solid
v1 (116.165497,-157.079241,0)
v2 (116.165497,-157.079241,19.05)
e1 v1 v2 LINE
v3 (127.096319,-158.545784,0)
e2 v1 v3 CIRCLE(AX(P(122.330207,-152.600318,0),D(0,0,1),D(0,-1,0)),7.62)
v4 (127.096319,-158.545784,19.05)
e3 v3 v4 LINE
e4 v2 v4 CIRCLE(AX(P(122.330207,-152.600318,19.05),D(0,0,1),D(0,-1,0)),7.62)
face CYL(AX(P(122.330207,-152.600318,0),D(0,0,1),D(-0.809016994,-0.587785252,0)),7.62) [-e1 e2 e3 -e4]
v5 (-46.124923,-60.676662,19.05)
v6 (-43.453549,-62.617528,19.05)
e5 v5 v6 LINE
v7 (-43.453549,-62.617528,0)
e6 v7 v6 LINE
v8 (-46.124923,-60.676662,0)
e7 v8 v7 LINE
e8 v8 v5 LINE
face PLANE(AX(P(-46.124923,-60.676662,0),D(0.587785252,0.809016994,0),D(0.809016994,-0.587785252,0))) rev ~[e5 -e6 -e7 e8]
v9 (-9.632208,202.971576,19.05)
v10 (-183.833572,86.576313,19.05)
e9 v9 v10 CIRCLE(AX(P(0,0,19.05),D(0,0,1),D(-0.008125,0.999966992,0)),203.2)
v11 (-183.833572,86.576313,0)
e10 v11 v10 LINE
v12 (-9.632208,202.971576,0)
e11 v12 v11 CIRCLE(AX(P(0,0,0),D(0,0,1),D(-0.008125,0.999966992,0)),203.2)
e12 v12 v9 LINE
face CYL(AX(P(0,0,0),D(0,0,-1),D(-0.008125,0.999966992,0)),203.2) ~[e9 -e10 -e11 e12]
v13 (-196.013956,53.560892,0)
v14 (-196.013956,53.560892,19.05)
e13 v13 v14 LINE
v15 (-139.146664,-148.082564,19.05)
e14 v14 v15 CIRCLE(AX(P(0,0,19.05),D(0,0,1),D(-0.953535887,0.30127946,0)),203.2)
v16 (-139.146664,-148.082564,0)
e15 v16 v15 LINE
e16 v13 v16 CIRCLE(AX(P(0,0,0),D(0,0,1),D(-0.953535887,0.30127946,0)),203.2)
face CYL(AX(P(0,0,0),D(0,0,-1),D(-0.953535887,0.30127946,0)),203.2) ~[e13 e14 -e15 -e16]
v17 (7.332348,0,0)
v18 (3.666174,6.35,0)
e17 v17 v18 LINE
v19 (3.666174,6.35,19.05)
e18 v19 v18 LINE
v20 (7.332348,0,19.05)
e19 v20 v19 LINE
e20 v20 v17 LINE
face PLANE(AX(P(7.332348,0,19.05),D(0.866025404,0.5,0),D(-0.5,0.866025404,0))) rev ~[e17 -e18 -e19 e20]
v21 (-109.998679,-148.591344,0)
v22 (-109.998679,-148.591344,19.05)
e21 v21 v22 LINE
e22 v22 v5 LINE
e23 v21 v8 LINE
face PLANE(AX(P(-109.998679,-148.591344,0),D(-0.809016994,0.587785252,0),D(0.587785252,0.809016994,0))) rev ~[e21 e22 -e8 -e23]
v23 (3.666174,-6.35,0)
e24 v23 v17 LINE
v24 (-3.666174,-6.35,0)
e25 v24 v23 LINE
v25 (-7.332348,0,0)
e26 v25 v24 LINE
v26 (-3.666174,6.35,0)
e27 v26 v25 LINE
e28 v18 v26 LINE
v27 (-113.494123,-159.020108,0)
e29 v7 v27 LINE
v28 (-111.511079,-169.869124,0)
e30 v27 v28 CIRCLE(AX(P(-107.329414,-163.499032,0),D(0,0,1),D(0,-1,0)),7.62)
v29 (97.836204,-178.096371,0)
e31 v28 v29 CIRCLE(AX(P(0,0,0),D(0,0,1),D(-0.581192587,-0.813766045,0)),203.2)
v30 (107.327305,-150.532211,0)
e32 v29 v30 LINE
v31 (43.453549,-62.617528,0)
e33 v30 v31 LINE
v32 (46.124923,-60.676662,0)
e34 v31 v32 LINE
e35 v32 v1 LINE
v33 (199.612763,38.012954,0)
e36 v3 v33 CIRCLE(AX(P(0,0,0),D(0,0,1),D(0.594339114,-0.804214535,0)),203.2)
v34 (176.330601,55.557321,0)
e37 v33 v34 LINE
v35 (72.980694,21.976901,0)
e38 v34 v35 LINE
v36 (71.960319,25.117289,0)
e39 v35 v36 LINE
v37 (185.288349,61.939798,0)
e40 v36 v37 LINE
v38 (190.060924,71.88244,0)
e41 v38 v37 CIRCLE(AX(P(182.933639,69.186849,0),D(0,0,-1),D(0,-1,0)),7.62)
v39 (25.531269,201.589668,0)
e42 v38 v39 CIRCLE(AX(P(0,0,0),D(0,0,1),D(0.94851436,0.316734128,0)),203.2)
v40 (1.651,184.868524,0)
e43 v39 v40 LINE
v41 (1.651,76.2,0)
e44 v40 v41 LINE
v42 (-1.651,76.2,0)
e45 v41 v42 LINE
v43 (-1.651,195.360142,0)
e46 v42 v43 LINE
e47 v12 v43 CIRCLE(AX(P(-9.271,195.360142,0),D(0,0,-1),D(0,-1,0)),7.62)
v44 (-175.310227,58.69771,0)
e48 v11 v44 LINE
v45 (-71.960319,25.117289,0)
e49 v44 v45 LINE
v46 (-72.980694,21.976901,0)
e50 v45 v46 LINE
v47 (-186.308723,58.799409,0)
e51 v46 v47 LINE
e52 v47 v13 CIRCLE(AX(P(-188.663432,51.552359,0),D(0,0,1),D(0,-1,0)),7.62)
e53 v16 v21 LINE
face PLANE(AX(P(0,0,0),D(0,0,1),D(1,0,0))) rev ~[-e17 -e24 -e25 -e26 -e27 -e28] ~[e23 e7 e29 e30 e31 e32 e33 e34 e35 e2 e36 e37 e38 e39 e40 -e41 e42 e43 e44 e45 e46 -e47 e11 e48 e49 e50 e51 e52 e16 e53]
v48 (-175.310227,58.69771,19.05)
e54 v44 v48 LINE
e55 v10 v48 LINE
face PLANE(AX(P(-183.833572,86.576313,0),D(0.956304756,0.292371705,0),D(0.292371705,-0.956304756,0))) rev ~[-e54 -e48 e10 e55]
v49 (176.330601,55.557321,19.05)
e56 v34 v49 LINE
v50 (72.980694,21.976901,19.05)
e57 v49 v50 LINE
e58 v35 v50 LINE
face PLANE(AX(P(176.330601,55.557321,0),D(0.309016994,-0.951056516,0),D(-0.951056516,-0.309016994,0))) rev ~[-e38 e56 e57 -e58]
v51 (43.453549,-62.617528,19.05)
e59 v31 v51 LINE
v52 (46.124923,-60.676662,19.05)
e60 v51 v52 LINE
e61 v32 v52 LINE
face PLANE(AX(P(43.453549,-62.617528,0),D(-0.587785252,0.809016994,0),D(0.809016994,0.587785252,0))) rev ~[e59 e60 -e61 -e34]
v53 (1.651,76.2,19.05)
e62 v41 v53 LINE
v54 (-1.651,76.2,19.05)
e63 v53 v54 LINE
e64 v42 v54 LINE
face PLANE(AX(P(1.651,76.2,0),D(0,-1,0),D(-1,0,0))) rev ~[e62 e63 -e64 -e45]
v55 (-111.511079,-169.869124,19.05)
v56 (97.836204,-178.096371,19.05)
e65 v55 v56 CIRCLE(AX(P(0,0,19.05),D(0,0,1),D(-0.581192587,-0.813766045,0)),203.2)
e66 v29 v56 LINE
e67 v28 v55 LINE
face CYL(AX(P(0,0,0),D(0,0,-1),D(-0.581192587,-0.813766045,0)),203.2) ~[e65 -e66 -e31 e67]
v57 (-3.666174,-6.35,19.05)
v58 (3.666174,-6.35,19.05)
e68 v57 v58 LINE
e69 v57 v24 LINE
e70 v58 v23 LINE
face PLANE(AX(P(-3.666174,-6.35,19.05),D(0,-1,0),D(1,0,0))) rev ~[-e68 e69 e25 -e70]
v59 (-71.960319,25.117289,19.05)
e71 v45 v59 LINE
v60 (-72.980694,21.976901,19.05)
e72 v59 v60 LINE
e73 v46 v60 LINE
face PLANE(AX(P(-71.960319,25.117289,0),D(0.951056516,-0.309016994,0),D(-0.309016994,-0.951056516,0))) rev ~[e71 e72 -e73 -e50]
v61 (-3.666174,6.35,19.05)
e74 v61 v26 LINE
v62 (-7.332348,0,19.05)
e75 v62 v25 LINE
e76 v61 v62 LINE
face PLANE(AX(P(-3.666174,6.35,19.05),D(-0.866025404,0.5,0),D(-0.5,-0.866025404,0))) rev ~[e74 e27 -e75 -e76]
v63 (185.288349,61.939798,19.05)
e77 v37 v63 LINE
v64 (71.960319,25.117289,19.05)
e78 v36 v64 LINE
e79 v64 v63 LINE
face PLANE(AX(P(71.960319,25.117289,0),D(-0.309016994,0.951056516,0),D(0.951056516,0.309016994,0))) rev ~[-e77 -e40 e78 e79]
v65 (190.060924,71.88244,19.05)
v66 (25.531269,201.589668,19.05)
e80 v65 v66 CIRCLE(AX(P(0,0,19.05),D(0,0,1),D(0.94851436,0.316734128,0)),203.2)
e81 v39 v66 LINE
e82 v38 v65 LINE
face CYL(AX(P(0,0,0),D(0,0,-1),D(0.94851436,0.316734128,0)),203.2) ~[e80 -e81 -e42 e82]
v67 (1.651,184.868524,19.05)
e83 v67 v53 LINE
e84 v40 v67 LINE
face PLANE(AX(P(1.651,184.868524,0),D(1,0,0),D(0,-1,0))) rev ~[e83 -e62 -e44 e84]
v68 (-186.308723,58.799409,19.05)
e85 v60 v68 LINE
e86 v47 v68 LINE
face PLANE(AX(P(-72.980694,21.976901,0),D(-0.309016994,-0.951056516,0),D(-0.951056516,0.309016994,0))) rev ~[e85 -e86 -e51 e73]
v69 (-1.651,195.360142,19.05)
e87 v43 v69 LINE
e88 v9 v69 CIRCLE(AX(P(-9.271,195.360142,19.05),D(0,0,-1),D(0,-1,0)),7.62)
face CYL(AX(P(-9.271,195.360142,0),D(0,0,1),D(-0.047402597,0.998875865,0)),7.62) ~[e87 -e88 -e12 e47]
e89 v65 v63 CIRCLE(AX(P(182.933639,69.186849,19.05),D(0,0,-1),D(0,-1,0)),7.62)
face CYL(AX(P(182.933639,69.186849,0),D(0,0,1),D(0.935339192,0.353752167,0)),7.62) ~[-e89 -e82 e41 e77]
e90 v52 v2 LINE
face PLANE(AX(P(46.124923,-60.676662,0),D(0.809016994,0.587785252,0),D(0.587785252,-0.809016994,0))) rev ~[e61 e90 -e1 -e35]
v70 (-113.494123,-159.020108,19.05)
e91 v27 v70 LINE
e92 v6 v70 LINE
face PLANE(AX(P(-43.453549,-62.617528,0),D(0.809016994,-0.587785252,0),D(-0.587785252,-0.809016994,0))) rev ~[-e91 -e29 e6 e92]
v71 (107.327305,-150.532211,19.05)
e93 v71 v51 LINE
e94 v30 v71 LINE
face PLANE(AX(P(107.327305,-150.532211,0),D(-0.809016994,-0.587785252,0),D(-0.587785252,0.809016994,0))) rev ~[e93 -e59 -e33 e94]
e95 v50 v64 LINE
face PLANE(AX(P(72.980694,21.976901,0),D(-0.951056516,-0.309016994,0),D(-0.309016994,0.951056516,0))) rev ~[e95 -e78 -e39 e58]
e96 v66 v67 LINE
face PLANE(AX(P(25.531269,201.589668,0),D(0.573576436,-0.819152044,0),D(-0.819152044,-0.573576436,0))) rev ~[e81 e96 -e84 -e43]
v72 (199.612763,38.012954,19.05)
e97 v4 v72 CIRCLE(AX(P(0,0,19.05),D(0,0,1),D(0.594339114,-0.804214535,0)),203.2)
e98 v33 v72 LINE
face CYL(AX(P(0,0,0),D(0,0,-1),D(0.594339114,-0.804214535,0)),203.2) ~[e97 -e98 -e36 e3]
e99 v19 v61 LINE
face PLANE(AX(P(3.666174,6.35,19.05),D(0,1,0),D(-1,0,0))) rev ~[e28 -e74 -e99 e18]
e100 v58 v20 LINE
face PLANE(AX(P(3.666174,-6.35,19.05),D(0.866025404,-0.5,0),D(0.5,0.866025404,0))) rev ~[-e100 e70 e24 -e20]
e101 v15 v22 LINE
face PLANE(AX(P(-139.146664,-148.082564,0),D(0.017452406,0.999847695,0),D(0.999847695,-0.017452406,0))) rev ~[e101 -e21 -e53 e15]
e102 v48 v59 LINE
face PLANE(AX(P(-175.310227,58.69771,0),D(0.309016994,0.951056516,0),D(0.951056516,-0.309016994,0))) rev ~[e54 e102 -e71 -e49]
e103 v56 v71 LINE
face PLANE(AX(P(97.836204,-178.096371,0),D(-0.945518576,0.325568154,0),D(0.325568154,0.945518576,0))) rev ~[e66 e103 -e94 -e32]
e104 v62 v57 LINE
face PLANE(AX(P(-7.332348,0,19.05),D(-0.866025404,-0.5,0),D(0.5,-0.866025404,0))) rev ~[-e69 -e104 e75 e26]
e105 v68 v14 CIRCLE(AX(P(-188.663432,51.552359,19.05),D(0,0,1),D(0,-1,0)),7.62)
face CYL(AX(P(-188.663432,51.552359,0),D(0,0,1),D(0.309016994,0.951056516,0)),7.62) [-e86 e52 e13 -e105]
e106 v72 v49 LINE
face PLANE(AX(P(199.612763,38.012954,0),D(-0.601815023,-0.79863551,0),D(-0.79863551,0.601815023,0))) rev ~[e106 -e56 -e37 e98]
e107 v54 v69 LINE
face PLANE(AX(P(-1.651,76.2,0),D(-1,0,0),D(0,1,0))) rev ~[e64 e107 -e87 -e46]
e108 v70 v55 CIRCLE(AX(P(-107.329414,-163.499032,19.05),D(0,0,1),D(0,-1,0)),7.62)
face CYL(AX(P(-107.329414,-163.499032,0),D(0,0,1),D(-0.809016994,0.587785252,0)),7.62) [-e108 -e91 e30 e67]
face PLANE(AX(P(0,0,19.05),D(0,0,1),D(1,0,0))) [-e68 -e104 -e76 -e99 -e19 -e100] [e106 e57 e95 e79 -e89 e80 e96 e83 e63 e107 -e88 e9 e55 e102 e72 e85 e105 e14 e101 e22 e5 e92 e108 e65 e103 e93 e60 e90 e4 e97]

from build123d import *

# Parameters (mm, degrees)
F1_DEPTH = 19.05
F3_DEPTH = 19.05
F4_R     = 7.62


# Not quite as in the source:
# - a length typed as a fraction of an inch, garbled in the dataset ("3 / 203.2 mm" for 3/8 in), is restored


with BuildPart() as f1:
    # F0 (on Top) → F1 (new body)
    with BuildSketch(Plane.XY):
        with BuildLine():
            Line((-72.9806935994, 21.976900663), (-193.7584921492, 61.2199862795))
            ThreePointArc((-193.7584921492, 61.2199862795), (-196.6172683272, -51.3019472882), (-139.1466642939, -148.0825641859))
            Line((-139.1466642939, -148.0825641859), (-109.9986790571, -148.5913441608))
            Line((-109.9986790571, -148.5913441608), (-46.1249232824, -60.6766615198))
            Line((-46.1249232824, -60.6766615198), (-43.453549167, -62.6175284229))
            Line((-43.453549167, -62.6175284229), (-118.0983337572, -165.3572603903))
            ThreePointArc((-118.0983337572, -165.3572603903), (-11.9670260336, -202.8473078153), (97.8362036413, -178.0963707015))
            Line((97.8362036413, -178.0963707015), (107.3273049417, -150.5322110638))
            Line((107.3273049417, -150.5322110638), (43.453549167, -62.6175284229))
            Line((43.453549167, -62.6175284229), (46.1249232824, -60.6766615198))
            Line((46.1249232824, -60.6766615198), (120.7697078726, -163.4163934872))
            ThreePointArc((120.7697078726, -163.4163934872), (189.2212394942, -74.064583468), (199.6127634745, 38.0129538194))
            Line((199.6127634745, 38.0129538194), (176.330601432, 55.5573213216))
            Line((176.330601432, 55.5573213216), (72.9806935994, 21.976900663))
            Line((72.9806935994, 21.976900663), (71.960319484, 25.1172892798))
            Line((71.960319484, 25.1172892798), (192.7381180338, 64.3603748963))
            ThreePointArc((192.7381180338, 64.3603748963), (128.9121834343, 157.0728778695), (25.5312687742, 201.5896681747))
            Line((25.5312687742, 201.5896681747), (1.651, 184.8685239645))
            Line((1.651, 184.8685239645), (1.651, 76.2))
            Line((1.651, 76.2), (-1.651, 76.2))
            Line((-1.651, 76.2), (-1.651, 203.1932927018))
            ThreePointArc((-1.651, 203.1932927018), (-109.5491285678, 171.1409607021), (-183.8335715961, 86.5763128934))
            Line((-183.8335715961, 86.5763128934), (-175.3102273166, 58.6977099385))
            Line((-175.3102273166, 58.6977099385), (-71.960319484, 25.1172892798))
            Line((-71.960319484, 25.1172892798), (-72.9806935994, 21.976900663))
        make_face()
    extrude(amount=F1_DEPTH)

    # F2 (on face) → F3 (cut, through all)
    with BuildSketch(Plane.XY.offset(19.05)):
        Polygon((3.6661742094, 6.35), (-3.6661742094, 6.35), (-7.3323484187, 0), (-3.6661742094, -6.35), (3.6661742094, -6.35), (7.3323484187, 0), align=None)
    extrude(amount=-F3_DEPTH, mode=Mode.SUBTRACT)

    # F4
    f4_edges = [f1.edges().sort_by_distance(p)[0] for p in [
        (-193.758492, 61.219986, 9.525),
        (-1.651, 203.193293, 9.525),
        (192.738118, 64.360375, 9.525),
        (120.769708, -163.416393, 9.525),
        (-118.098334, -165.35726, 9.525),
    ]]
    fillet(f4_edges, radius=F4_R)


solid = f1.part
